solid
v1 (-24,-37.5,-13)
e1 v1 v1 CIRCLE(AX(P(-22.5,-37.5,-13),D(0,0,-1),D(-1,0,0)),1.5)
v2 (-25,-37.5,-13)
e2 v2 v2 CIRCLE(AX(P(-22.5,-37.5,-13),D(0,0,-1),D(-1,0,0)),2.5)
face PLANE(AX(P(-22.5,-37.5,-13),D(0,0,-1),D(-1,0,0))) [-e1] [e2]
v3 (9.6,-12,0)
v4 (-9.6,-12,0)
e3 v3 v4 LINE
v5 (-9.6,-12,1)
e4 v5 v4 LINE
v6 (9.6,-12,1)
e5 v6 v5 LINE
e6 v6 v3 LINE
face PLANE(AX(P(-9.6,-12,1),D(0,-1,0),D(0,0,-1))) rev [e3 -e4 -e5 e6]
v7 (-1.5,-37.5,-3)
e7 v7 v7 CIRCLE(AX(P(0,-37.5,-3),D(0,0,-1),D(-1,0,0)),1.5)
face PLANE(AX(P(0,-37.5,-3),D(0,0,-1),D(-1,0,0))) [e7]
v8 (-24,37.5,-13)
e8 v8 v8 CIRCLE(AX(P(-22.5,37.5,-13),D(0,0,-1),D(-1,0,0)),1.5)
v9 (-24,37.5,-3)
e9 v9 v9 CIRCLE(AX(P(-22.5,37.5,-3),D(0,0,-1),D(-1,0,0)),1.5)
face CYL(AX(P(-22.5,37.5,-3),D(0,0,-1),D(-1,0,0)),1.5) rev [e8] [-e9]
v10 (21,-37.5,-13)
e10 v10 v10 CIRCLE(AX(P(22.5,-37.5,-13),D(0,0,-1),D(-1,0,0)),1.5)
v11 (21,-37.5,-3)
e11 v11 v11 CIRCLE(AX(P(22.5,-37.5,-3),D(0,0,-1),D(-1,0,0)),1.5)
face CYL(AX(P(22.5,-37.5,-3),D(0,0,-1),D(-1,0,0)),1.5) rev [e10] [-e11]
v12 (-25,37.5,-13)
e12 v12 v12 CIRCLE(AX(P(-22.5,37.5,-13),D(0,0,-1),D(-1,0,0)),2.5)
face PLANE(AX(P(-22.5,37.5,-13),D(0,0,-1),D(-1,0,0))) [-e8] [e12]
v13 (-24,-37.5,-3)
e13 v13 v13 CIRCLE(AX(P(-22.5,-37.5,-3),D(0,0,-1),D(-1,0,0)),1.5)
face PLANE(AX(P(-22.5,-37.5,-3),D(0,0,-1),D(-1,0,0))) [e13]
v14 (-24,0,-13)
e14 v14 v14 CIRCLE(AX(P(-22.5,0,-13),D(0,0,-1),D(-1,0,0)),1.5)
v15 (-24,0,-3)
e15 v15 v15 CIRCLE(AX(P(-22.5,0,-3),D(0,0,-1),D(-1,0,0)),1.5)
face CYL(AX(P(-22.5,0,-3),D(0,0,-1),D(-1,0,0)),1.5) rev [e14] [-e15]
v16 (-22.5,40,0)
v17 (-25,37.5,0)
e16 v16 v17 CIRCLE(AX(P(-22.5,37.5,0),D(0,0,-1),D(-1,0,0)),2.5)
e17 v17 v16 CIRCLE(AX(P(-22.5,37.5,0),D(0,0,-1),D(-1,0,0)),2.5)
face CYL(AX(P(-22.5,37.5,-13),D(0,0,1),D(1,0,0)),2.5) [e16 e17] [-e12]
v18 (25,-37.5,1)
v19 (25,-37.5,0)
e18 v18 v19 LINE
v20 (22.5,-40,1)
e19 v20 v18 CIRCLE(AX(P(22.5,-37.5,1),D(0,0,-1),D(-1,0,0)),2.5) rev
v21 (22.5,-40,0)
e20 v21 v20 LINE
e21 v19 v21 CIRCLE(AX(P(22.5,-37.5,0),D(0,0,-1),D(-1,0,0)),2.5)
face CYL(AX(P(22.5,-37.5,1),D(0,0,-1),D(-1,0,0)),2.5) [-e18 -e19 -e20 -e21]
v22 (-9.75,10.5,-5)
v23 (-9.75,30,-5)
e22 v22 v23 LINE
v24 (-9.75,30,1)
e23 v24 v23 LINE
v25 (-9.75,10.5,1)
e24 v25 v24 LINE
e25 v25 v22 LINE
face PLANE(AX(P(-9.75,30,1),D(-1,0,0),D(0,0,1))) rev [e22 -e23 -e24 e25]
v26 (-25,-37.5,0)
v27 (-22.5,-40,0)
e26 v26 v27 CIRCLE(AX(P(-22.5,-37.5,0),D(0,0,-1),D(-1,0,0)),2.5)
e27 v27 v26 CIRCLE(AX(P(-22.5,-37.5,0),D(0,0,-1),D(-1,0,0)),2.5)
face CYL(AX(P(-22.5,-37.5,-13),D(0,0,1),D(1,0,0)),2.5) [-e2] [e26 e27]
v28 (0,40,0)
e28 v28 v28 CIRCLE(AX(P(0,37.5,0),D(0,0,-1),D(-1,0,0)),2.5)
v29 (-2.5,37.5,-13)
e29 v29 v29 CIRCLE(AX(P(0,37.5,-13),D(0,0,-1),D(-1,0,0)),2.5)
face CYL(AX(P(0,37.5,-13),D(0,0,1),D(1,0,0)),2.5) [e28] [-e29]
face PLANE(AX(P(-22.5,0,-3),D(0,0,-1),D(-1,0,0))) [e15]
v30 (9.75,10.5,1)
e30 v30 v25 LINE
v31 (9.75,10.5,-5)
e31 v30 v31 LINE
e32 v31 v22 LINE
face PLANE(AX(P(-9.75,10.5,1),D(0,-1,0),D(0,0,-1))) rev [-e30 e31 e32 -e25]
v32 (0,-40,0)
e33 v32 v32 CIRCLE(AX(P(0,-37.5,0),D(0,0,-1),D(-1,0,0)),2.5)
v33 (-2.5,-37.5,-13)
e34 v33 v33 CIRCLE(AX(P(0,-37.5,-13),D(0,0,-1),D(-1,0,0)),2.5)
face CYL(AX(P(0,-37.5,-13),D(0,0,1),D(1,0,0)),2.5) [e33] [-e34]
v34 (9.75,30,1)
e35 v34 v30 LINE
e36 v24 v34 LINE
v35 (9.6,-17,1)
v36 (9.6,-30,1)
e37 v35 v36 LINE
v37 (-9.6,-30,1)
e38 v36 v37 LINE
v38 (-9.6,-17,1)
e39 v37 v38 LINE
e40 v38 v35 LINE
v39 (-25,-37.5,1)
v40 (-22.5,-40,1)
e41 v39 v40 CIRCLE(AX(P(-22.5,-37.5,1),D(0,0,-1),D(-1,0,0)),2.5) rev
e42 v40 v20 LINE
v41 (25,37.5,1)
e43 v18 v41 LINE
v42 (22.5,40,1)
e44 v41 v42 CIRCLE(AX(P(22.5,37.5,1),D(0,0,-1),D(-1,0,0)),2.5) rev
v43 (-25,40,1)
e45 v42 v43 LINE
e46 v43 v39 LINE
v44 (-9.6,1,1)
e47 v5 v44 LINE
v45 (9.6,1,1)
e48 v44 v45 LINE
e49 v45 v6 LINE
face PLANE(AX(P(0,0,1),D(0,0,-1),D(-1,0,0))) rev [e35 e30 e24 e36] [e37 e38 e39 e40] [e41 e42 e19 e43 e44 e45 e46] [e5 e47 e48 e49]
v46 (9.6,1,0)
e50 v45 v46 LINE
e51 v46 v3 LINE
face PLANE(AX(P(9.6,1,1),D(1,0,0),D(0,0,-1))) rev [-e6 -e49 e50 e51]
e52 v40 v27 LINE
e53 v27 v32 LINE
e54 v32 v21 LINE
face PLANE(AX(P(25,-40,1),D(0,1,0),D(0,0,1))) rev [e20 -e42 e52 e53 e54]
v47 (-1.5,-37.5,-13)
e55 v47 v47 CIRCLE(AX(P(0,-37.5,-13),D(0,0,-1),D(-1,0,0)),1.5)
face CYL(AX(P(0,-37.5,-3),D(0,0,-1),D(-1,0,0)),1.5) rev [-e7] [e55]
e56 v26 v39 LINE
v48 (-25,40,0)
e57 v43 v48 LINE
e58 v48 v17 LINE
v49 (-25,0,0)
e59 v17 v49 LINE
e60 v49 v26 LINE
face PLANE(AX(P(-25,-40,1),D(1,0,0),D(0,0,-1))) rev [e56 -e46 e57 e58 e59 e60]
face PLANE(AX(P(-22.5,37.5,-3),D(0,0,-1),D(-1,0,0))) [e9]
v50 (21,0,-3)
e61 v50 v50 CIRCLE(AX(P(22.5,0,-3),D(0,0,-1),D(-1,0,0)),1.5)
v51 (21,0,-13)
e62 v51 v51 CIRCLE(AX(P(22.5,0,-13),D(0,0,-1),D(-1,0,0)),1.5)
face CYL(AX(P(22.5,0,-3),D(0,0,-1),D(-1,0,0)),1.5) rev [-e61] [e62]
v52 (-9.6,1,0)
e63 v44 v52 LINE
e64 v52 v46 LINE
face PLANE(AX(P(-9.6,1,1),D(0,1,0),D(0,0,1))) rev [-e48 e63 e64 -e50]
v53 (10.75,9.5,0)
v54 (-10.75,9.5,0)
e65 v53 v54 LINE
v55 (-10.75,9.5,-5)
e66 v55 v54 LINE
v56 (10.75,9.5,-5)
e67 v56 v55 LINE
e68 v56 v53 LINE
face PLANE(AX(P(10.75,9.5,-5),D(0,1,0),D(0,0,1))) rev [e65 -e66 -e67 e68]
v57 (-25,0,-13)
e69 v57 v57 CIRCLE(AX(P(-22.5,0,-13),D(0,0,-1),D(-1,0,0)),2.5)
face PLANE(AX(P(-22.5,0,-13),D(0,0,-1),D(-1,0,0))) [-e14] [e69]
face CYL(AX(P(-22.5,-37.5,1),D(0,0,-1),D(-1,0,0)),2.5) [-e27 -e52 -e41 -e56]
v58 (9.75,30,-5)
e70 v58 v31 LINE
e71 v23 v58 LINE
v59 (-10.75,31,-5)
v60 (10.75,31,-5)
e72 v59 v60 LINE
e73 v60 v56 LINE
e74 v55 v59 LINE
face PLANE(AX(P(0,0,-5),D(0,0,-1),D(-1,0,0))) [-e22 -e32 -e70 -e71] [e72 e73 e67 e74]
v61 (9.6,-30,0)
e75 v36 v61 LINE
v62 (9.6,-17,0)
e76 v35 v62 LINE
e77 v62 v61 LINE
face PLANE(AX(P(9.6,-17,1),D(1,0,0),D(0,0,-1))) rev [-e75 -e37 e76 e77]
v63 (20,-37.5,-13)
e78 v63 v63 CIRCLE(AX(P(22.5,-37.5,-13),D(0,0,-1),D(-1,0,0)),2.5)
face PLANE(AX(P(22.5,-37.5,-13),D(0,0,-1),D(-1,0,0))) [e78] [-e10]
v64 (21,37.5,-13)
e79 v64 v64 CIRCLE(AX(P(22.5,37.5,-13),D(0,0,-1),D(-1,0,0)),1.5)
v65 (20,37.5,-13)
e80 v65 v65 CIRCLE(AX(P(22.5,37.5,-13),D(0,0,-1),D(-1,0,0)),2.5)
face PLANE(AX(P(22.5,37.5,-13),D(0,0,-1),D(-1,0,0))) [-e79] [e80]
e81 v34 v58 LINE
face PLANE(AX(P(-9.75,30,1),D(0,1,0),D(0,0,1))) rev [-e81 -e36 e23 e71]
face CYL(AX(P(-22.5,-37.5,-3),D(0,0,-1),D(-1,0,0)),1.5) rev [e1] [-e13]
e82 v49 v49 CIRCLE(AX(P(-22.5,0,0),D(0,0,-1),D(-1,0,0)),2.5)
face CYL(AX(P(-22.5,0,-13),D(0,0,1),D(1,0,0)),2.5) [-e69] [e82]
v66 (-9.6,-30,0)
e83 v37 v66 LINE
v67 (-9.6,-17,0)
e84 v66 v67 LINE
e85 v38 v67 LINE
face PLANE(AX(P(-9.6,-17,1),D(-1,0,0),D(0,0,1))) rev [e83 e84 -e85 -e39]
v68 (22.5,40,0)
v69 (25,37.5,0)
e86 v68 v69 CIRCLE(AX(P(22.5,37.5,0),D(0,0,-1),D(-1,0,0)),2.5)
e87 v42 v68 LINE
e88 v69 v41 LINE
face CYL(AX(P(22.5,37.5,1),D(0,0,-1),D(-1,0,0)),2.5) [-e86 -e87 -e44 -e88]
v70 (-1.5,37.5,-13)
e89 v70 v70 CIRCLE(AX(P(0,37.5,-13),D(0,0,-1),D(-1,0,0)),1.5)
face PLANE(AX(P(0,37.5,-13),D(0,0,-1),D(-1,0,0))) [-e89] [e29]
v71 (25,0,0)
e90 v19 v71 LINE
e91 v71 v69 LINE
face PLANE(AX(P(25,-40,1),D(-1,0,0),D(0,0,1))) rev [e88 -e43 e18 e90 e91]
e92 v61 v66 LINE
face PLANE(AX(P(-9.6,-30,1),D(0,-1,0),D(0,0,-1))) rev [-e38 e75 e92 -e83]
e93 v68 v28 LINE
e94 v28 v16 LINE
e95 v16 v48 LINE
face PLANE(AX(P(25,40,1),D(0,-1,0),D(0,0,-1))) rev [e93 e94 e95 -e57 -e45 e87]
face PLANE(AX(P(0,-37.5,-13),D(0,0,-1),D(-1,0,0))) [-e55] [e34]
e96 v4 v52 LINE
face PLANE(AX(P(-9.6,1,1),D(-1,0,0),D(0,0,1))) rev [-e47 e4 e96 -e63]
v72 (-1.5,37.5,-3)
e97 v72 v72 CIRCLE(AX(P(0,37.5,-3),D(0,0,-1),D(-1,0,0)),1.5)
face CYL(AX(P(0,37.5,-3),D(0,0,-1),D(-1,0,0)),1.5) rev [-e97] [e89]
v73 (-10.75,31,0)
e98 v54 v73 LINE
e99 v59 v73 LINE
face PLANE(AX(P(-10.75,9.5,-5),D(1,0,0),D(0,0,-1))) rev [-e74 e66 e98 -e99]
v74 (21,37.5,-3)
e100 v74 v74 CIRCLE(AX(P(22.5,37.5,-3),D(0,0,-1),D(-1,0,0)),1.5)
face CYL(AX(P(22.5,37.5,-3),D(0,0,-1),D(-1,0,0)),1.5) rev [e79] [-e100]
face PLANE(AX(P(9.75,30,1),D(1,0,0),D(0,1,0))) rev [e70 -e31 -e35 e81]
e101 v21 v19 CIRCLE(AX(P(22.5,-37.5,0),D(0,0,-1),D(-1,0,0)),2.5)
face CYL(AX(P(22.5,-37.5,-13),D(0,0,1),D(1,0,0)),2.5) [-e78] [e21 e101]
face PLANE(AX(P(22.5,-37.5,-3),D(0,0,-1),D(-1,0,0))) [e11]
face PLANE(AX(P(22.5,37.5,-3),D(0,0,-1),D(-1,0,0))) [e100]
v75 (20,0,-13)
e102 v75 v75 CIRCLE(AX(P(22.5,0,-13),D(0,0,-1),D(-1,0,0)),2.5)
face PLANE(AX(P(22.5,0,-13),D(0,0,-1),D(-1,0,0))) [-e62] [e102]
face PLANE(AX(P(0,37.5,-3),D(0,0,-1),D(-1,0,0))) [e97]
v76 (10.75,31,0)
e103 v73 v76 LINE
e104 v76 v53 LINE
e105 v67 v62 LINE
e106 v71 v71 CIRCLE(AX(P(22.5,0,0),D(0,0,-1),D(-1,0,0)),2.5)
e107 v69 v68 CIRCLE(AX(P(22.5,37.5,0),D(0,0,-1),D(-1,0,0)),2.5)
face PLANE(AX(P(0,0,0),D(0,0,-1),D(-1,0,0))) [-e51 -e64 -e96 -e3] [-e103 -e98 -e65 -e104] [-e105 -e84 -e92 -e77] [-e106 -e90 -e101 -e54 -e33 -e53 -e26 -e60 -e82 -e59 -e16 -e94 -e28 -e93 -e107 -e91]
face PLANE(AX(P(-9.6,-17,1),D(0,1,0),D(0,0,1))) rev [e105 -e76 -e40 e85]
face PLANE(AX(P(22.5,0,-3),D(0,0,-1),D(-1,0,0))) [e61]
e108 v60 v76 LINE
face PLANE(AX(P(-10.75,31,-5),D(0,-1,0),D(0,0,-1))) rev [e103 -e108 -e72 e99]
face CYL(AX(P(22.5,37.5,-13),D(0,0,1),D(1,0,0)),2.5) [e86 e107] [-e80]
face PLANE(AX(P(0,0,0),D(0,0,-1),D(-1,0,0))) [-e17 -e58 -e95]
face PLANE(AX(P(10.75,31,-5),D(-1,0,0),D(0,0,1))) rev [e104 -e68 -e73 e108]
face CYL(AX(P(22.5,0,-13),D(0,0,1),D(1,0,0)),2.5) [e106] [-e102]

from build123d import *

# Parameters (mm, degrees)
SKETCH1_W           = 80
SKETCH1_H           = 50
BOSS_EXTRUDE1_DEPTH = 1
SKETCH4_W           = 19.2
SKETCH4_H           = 13
SKETCH4_W_2         = 19.5
SKETCH4_H_2         = 19.5
CUT_EXTRUDE1_DEPTH  = 1
SKETCH5_R           = 2.5
BOSS_EXTRUDE2_DEPTH = 13
FILLET1_R           = 2.5
SKETCH6_W           = 21.5
SKETCH6_H           = 21.5
SKETCH6_W_2         = 19.5
SKETCH6_H_2         = 19.5
BOSS_EXTRUDE3_DEPTH = 5
SKETCH7_R           = 1.5
CUT_EXTRUDE2_DEPTH  = 10


with BuildPart() as part:
    # Sketch1 → Boss-Extrude1 (new body)
    with BuildSketch(Plane(origin=(0, 0, 0), x_dir=(0, 1, 0), z_dir=(0, 0, 1))):
        Rectangle(SKETCH1_W, SKETCH1_H)
    extrude(amount=BOSS_EXTRUDE1_DEPTH)

    # Sketch4 → Cut-Extrude1 (cut)
    with BuildSketch(Plane(origin=(0, 0, 0), x_dir=(1, 0, 0), z_dir=(0, 0, -1))):
        with Locations((0, 23.5)):
            Rectangle(SKETCH4_W, SKETCH4_H)
        with Locations((0, 5.5)):
            Rectangle(SKETCH4_W, SKETCH4_H)
        with Locations((0, -20.25)):
            Rectangle(SKETCH4_W_2, SKETCH4_H_2)
    extrude(amount=-CUT_EXTRUDE1_DEPTH, mode=Mode.SUBTRACT)

    # Sketch5 → Boss-Extrude2 (add)
    with BuildSketch(Plane(origin=(0, 0, 0), x_dir=(1, 0, 0), z_dir=(0, 0, -1))):
        with Locations(Location((0, 37.5, 0), (0, 0, 90))):
            Circle(SKETCH5_R)
        with Locations(Location((-22.5, 37.5, 0), (0, 0, 180))):
            Circle(SKETCH5_R)
        with Locations((22.5, 37.5)):
            Circle(SKETCH5_R)
        with Locations(Location((-22.5, 0, 0), (0, 0, 180))):
            Circle(SKETCH5_R)
        with Locations((22.5, 0)):
            Circle(SKETCH5_R)
        with Locations((22.5, -37.5)):
            Circle(SKETCH5_R)
        with Locations(Location((-22.5, -37.5, 0), (0, 0, 180))):
            Circle(SKETCH5_R)
        with Locations(Location((0, -37.5, 0), (0, 0, 270))):
            Circle(SKETCH5_R)
    extrude(amount=BOSS_EXTRUDE2_DEPTH)

    # Fillet1
    fillet1_edges = [part.edges().sort_by_distance(p)[0] for p in [
        (25, 40, 0.5),
        (25, -40, 0.5),
        (-25, -40, 0.5),
    ]]
    fillet(fillet1_edges, radius=FILLET1_R - 0.0001)  # a hair under: the kernel refuses the full size

    # Sketch6 → Boss-Extrude3 (add)
    with BuildSketch(Plane(origin=(0, 0, 0), x_dir=(1, 0, 0), z_dir=(0, 0, -1))):
        with Locations((0, -20.25)):
            Rectangle(SKETCH6_W, SKETCH6_H)
        with Locations((0, -20.25)):
            Rectangle(SKETCH6_W_2, SKETCH6_H_2, mode=Mode.SUBTRACT)
    extrude(amount=BOSS_EXTRUDE3_DEPTH)

    # Sketch7 → Cut-Extrude2 (cut)
    with BuildSketch(Plane(origin=(0, 0, -13), x_dir=(1, 0, 0), z_dir=(0, 0, -1))):
        with Locations(Location((-22.5, 37.5, 0), (0, 0, 180))):
            Circle(SKETCH7_R)
        with Locations(Location((0, 37.5, 0), (0, 0, 180))):
            Circle(SKETCH7_R)
        with Locations(Location((22.5, 37.5, 0), (0, 0, 180))):
            Circle(SKETCH7_R)
        with Locations(Location((-22.5, 0, 0), (0, 0, 180))):
            Circle(SKETCH7_R)
        with Locations(Location((22.5, 0, 0), (0, 0, 180))):
            Circle(SKETCH7_R)
        with Locations(Location((22.5, -37.5, 0), (0, 0, 180))):
            Circle(SKETCH7_R)
        with Locations(Location((0, -37.5, 0), (0, 0, 180))):
            Circle(SKETCH7_R)
        with Locations(Location((-22.5, -37.5, 0), (0, 0, 180))):
            Circle(SKETCH7_R)
    extrude(amount=-CUT_EXTRUDE2_DEPTH, mode=Mode.SUBTRACT)


solid = part.part
